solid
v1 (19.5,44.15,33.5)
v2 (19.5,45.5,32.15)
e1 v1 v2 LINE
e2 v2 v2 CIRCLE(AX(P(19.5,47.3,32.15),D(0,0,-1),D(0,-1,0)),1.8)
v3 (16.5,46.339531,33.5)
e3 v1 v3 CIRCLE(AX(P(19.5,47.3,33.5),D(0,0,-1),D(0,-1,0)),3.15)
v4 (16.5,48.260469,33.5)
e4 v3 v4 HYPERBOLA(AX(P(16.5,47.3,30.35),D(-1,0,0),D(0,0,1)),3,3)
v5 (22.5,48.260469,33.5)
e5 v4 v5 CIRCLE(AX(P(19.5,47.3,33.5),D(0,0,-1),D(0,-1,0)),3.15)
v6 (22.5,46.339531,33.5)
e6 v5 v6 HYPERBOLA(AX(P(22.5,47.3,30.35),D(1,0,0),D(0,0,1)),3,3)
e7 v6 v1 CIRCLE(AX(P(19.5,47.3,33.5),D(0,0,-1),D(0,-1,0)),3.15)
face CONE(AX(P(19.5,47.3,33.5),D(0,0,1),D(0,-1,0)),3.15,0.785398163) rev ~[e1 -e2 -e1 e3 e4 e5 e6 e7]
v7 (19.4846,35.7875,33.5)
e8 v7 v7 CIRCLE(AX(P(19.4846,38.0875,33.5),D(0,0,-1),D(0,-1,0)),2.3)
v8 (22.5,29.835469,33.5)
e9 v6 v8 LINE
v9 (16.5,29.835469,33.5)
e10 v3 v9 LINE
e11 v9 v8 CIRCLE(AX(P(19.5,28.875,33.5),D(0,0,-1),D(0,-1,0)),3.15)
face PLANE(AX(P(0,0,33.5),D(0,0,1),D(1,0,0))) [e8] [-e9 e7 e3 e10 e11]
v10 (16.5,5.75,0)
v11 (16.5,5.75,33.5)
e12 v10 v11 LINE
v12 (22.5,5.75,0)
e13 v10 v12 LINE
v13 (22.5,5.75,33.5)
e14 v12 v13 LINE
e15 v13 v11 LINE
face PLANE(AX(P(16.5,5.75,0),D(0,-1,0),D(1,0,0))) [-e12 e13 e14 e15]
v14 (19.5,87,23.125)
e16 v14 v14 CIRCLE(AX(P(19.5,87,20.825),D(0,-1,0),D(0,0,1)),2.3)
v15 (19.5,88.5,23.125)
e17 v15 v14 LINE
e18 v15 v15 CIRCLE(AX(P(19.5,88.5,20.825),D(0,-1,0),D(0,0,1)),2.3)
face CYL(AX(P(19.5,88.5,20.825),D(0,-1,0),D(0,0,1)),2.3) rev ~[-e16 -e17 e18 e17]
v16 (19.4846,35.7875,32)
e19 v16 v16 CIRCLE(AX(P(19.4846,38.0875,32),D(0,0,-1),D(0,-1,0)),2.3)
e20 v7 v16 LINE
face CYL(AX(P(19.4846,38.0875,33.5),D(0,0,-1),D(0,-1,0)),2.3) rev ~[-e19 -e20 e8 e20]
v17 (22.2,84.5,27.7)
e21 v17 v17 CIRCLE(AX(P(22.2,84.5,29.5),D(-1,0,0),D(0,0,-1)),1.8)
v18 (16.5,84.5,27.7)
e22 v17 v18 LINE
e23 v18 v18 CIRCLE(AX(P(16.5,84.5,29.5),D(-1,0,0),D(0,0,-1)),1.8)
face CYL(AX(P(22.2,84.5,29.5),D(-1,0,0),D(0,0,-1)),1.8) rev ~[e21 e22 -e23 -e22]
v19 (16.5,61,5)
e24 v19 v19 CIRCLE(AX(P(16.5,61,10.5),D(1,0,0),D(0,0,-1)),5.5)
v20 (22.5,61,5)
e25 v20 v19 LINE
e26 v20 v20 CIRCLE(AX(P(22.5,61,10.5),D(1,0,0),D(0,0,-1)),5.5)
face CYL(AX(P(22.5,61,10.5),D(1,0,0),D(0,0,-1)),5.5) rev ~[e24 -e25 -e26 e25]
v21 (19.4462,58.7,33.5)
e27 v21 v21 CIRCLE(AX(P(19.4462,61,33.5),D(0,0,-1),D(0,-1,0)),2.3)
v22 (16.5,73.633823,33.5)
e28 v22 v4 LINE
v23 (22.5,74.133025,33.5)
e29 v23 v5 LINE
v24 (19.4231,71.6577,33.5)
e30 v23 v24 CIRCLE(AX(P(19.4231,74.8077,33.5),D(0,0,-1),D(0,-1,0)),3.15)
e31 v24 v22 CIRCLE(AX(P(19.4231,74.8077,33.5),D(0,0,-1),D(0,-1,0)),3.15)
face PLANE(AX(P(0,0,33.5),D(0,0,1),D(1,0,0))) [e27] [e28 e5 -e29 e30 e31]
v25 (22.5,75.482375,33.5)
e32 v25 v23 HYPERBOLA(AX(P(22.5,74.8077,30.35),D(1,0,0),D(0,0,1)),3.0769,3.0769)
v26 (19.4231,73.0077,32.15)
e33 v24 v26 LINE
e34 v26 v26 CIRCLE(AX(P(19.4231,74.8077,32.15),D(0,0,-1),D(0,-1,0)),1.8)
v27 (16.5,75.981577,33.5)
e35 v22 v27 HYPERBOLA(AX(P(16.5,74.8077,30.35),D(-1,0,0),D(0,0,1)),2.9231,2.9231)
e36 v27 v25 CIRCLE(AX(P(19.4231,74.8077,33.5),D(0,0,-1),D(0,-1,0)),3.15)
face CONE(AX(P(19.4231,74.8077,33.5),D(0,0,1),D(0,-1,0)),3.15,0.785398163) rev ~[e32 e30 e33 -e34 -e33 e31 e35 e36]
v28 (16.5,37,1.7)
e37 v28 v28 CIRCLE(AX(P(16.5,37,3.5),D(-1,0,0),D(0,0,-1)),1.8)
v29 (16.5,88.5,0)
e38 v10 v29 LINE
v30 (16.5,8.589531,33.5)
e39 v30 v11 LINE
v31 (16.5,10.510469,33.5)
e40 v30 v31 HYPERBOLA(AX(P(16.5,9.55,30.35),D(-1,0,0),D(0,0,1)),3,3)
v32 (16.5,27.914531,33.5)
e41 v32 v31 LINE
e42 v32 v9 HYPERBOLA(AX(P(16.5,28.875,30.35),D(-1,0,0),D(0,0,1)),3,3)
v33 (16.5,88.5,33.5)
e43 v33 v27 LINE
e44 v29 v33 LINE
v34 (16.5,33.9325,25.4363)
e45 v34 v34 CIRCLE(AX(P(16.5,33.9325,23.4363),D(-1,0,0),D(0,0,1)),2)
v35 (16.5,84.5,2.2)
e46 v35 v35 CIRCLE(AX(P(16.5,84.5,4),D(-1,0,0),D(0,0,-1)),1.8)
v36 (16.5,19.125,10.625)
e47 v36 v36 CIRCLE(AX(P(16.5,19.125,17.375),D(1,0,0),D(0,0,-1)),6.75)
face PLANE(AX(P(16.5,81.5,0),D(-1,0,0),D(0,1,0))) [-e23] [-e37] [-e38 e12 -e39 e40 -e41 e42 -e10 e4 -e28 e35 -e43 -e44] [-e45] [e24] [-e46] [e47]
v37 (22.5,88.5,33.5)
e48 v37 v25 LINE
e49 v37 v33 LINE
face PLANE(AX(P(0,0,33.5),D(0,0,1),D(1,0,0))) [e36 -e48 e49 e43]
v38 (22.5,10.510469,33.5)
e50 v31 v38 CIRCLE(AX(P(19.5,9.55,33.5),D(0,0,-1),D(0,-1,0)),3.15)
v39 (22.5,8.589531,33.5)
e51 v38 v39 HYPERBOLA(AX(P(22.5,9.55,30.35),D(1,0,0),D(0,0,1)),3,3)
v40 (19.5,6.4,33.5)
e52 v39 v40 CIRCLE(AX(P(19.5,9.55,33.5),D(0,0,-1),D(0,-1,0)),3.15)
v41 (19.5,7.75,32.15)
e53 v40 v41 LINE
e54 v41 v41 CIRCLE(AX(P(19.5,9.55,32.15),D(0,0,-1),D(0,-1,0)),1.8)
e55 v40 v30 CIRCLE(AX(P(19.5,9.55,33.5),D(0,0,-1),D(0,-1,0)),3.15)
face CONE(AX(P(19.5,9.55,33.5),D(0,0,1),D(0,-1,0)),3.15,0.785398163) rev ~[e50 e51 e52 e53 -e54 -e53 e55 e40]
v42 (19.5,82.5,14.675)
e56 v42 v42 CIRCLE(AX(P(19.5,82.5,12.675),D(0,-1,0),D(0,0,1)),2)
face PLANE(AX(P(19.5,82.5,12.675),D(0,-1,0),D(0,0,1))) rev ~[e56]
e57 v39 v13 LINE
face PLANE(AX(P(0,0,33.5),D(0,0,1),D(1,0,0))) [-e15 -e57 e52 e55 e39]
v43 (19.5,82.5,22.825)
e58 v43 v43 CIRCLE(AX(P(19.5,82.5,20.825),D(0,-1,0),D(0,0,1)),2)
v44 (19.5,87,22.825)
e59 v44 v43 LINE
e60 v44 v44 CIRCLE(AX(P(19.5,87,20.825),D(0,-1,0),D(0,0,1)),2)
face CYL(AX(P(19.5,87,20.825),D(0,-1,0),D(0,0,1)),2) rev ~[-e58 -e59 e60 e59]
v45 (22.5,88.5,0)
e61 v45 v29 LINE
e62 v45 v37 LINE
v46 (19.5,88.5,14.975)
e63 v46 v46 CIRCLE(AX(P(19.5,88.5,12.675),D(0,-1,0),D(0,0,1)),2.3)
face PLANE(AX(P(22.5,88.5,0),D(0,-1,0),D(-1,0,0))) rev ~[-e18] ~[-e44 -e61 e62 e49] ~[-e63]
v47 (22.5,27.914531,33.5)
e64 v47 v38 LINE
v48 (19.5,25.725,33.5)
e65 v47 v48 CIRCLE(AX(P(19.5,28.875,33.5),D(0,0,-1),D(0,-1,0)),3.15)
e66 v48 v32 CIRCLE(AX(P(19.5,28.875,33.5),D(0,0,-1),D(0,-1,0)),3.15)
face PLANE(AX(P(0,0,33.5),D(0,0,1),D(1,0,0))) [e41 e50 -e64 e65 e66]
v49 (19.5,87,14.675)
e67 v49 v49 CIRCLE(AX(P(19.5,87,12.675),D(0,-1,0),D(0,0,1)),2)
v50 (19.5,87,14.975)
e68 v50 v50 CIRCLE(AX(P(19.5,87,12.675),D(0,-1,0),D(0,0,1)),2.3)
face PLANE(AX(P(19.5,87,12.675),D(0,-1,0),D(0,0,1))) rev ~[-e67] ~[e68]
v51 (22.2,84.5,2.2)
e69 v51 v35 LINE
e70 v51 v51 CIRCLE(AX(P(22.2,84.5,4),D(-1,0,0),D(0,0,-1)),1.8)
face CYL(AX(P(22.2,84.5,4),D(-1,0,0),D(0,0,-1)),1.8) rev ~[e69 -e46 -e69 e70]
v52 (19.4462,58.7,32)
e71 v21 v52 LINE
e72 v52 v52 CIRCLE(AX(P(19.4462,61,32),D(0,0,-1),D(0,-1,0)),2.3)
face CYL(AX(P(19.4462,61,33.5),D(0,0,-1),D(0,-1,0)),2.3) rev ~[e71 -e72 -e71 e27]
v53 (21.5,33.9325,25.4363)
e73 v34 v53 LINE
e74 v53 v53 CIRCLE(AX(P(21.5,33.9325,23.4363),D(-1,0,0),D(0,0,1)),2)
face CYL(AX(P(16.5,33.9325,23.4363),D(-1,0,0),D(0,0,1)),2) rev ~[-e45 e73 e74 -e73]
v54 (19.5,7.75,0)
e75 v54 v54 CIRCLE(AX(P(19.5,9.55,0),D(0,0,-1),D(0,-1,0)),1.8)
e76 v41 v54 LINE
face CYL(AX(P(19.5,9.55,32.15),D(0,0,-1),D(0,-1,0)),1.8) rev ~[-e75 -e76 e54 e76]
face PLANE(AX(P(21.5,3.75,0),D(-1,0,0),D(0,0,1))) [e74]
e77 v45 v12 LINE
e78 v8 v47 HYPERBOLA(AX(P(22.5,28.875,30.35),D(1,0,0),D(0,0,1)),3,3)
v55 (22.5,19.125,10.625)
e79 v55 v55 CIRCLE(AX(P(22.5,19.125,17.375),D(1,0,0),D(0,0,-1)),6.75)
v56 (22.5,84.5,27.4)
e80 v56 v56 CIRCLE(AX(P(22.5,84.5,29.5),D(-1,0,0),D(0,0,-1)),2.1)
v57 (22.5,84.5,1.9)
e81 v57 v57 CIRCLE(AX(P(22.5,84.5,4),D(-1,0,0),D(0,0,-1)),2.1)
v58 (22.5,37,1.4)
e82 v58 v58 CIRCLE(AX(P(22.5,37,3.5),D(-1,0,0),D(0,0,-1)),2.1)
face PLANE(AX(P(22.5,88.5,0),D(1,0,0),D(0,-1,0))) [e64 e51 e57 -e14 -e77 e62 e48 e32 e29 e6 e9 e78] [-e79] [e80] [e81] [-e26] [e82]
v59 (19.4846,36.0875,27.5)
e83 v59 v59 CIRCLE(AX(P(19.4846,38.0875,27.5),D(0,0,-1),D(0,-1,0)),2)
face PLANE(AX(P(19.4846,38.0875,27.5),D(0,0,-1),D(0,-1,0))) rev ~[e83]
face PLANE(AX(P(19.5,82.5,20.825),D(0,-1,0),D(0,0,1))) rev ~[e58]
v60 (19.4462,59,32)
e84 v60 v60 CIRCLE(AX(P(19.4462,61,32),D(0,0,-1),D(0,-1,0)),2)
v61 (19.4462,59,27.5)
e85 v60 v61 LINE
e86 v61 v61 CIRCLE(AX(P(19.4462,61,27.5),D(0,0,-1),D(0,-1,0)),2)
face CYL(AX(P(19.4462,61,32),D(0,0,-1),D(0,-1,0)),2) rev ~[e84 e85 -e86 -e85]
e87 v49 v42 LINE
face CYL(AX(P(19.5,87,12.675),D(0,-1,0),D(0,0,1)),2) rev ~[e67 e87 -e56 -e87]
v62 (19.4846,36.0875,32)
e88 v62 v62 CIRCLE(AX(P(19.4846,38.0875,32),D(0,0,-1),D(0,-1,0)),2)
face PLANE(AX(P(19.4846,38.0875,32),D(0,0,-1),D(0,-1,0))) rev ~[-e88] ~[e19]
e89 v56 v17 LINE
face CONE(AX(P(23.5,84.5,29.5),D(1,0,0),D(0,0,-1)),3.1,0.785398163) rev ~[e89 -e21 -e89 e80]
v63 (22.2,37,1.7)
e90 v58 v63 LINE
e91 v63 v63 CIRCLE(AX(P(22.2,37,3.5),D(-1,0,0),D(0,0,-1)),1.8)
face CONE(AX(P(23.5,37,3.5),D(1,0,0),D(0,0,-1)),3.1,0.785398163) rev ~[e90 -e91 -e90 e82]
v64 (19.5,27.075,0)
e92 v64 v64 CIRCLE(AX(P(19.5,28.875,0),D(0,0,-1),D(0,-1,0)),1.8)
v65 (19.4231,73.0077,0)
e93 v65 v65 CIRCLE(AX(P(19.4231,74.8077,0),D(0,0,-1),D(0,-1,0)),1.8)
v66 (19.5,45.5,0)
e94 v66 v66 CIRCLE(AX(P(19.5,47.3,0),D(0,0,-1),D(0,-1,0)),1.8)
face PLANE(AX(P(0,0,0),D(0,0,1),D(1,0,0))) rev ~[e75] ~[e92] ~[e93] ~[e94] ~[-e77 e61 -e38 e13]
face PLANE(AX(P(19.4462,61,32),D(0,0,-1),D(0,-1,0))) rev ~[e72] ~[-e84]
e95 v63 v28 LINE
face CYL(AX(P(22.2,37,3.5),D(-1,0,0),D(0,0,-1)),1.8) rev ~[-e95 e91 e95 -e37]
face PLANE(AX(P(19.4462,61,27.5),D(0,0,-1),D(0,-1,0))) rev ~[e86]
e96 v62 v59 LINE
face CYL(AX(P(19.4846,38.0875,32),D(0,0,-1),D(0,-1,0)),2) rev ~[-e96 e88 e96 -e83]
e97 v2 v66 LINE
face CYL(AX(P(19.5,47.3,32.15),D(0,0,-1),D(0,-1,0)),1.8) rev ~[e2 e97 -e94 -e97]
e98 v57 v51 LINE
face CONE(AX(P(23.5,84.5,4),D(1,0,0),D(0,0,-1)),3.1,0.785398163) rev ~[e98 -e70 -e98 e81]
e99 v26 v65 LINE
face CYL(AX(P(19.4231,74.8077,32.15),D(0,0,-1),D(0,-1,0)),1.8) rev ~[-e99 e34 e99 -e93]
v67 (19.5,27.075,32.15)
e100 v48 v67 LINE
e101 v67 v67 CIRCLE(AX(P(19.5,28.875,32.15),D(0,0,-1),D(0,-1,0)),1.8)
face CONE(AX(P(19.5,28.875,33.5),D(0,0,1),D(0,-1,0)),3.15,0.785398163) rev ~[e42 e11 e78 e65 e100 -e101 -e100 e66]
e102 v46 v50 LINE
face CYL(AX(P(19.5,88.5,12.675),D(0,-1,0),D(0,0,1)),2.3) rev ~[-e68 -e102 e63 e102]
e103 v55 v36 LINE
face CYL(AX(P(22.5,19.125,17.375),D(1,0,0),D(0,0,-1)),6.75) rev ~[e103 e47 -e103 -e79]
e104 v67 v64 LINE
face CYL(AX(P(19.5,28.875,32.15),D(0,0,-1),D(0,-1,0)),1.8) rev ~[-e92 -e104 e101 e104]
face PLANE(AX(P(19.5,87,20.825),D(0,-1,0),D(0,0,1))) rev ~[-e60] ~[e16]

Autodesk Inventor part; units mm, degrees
ref_plane "YZ Plane" through (0, 0, 0) normal (1, 0, 0) x (0, 1, 0)
ref_plane "XZ Plane" through (0, 0, 0) normal (0, 1, 0) x (-1, 0, 0)
ref_plane "Work Plane1" through (0, 0, 0) normal (0, 0, 1) x (1, 0, 0)
sketch "Sketch1" plane through (0, 0, 0) normal (0, 0, 1) x (1, 0, 0)
  line L0 (23.5, 88.5) -> (-23.5, 88.5) projected
  line L1 (-23.5, 88.5) -> (-23.5, 36.5) projected
  line L2 (-26.5, 33.5) -> (-89, 33.5) projected
  line L3 (-89, 33.5) -> (-89, -72.5) projected
  line L4 (-89, -72.5) -> (-77, -72.5) projected
  line L5 (-74, -75.5) -> (-74, -93.5) projected
  line L6 (-74, -93.5) -> (74, -93.5) projected
  line L7 (74, -93.5) -> (74, -75.5) projected
  line L8 (77, -72.5) -> (89, -72.5) projected
  line L9 (89, -72.5) -> (89, 33.5) projected
  line L10 (89, 33.5) -> (26.5, 33.5) projected
  line L11 (23.5, 36.5) -> (23.5, 88.5) projected
  line L12 (-4.5, 81.5) -> (-4.5, 36.5) projected
  line L13 (-7.5, 33.5) -> (-13.5, 33.5) projected
  line L14 (-16.5, 36.5) -> (-16.5, 81.5) projected
  line L15 (7.5, 84.5) -> (13.5, 84.5) projected
  line L16 (16.5, 81.5) -> (16.5, 36.5) projected
  line L17 (13.5, 33.5) -> (7.5, 33.5) projected
  line L18 (4.5, 36.5) -> (4.5, 81.5) projected
  line L19 (-13.5, 84.5) -> (-7.5, 84.5) projected
  line L20 (16.5, 88.5) -> (22.5, 88.5)
  line L21 (22.5, 88.5) -> (22.5, 3.75)
  line L22 (22.5, 3.75) -> (16.5, 3.75)
  line L23 (16.5, 3.75) -> (16.5, 88.5)
  line L24 (59.9, 4.75) -> (32.2, 4.75)
  arc A0 (13.5, 33.5) -> (16.5, 36.5) centre (13.5, 36.5) ccw projected
  arc A1 (4.5, 36.5) -> (7.5, 33.5) centre (7.5, 36.5) ccw projected
  arc A2 (7.5, 84.5) -> (4.5, 81.5) centre (7.5, 81.5) ccw projected
  arc A3 (16.5, 81.5) -> (13.5, 84.5) centre (13.5, 81.5) ccw projected
  arc A4 (-4.5, 81.5) -> (-7.5, 84.5) centre (-7.5, 81.5) ccw projected
  arc A5 (-7.5, 33.5) -> (-4.5, 36.5) centre (-7.5, 36.5) ccw projected
  arc A6 (-16.5, 36.5) -> (-13.5, 33.5) centre (-13.5, 36.5) ccw projected
  arc A7 (-13.5, 84.5) -> (-16.5, 81.5) centre (-13.5, 81.5) ccw projected
  arc A8 (-26.5, 33.5) -> (-23.5, 36.5) centre (-26.5, 36.5) ccw projected
  arc A9 (-74, -75.5) -> (-77, -72.5) centre (-77, -75.5) ccw projected
  arc A10 (77, -72.5) -> (74, -75.5) centre (77, -75.5) ccw projected
  arc A11 (23.5, 36.5) -> (26.5, 33.5) centre (26.5, 36.5) ccw projected
  circle A12 centre (21.5, -85.5) radius 1.8 projected
  circle A13 centre (-64.5, -85.5) radius 1.8 projected
  circle A14 centre (83.4, -16.3889) radius 1.8 projected
  circle A15 centre (-83.4, -19.2889) radius 1.8 projected
  circle A16 centre (-21.5, -85.5) radius 1.8 projected
  circle A17 centre (64.5, -85.5) radius 1.8 projected
  circle A18 centre (-56.0375, 15.0937) radius 1.0065 projected
  circle A19 centre (39.125, 4.3375) radius 1.0065 projected
  circle A20 centre (-72.95, 4.275) radius 1.0065 projected
  circle A21 centre (39.125, 25.9125) radius 1.0065 projected
  circle A22 centre (72.95, 12.275) radius 1.0065 projected
  circle A23 centre (86, 30.5) radius 1.0065 projected
  circle A24 centre (-86, 30.5) radius 1.0065 projected
  circle A25 centre (-39.125, 12.3375) radius 1.0065 projected
  circle A26 centre (-72.95, 25.975) radius 1.0065 projected
  circle A27 centre (-72.95, 12.275) radius 1.0065 projected
  circle A28 centre (-39.125, 25.9125) radius 1.0065 projected
  circle A29 centre (-86, 7.75) radius 1.0065 projected
  circle A30 centre (86, 7.75) radius 1.0065 projected
  circle A31 centre (72.95, 25.975) radius 1.0065 projected
  circle A32 centre (39.125, 12.3375) radius 1.0065 projected
  circle A33 centre (-39.125, 4.3375) radius 1.0065 projected
  circle A34 centre (72.95, 4.275) radius 1.0065 projected
  circle A35 centre (56.0375, 15.125) radius 1.0065 projected
  circle A36 centre (78, -67.1725) radius 1.2295 projected
  circle A37 centre (-24.1, -73.1) radius 1.2295 projected
  circle A38 centre (24.1, -24.9) radius 1.2295 projected
  circle A39 centre (-42.5, -43.2802) radius 1.2295 projected
  circle A40 centre (-79, -42.3889) radius 1.2295 projected
  circle A41 centre (-19.5, 28.875) radius 1.2295 projected
  circle A42 centre (19.5, 9.55) radius 1.2295 projected
  circle A43 centre (19.5, 47.3) radius 1.2295 projected
  circle A44 centre (-19.5, 47.3) radius 1.2295 projected
  circle A45 centre (0, 74.7) radius 1.2295 projected
  circle A46 centre (-19.4231, 74.8077) radius 1.2295 projected
  circle A47 centre (19.5, 74.7) radius 1.2295 projected
  circle A48 centre (0, 49.05) radius 1.2295 projected
  circle A49 centre (19.5, 28.875) radius 1.2295 projected
  circle A50 centre (0, 19.125) radius 1.2295 projected
  circle A51 centre (-19.5, 9.55) radius 1.2295 projected
  circle A52 centre (-78, -67.1725) radius 1.2295 projected
  circle A53 centre (-24.1, -24.9) radius 1.2295 projected
  circle A54 centre (24.1, -73.1) radius 1.2295 projected
  circle A55 centre (42.5, -42.7745) radius 1.2295 projected
  circle A56 centre (79, -42.3889) radius 1.2295 projected
  point P0 (0, 0)
  point P1 (7.5, 81.5)
  point P2 (13.5, 81.5)
  point P3 (-7.5, 81.5)
  point P4 (-13.5, 81.5)
  dimension "d0" = 1
  dimension "d1" = 1
ref_plane "Work Plane2" through (-89, -40.3889, 33.5) normal (0, 0, 1) x (1, 0, 0)
extrude "Extrusion1" add sketch "Sketch1" along normal up to surface (33.5 mm away) contours L21 L22 L23 L16 L0 | A42 | A43 | A47 | A49
sketch "Sketch2" plane through (22.5, 3.75, 0) normal (1, 0, 0) x (0, 0, -1)
  circle A0 centre (-17.375, 15.375) radius 6.75 projected
  circle A1 centre (-10.5, 57.25) radius 5.5 projected
  point P0 (0, -3.75)
  dimension "d8" = 11
extrude "Extrusion2" cut sketch "Sketch2" against normal up to next
sketch "Sketch3" plane through (16.5, 3.75, 0) normal (-1, 0, 0) x (0, 0, 1)
  circle A0 centre (23.4363, 30.1825) radius 2 projected
  point P0 (0, -3.75)
extrude "Extrusion3" cut sketch "Sketch3" against normal blind 5
ref_plane "Work Plane3" through (23.5, 3.75, 0) normal (1, 0, 0) x (0, 0, -1)
sketch "Sketch4" plane through (23.5, 3.75, 0) normal (1, 0, 0) x (0, 0, -1)
  circle A0 centre (-29.5, 80.75) radius 1.8 projected
  circle A1 centre (-3.5, 33.25) radius 1.8 projected
  circle A2 centre (-4, 80.75) radius 1.8 projected
  point P0 (0, -3.75)
hole "Hole1" at (23.5, 37, 3.5) at (23.5, 84.5, 4) at (23.5, 84.5, 29.5) direction (-1, 0, 0) diameter 3.6 end through all countersink diameter 6.2 countersink angle 90 clearance for "Countersunk Flat Head Screw ISO 2009/7046" size "M3" standard "ISO"
sketch "Sketch5" plane through (16.5, 3.75, 33.5) normal (0, 0, 1) x (1, 0, 0)
  circle A0 centre (-36, 5.8) radius 1.8 projected
  circle A1 centre (-36, 25.125) radius 1.8 projected
  circle A2 centre (-36, 43.55) radius 1.8 projected
  circle A3 centre (-35.9231, 71.0577) radius 1.8 projected
  circle A4 centre (-16.5, 45.3) radius 3.3 projected
  circle A5 centre (-16.5, 15.375) radius 3.3 projected
  circle A6 centre (-16.5, 70.95) radius 3.3 projected
  line L0 (-12, 2) -> (-21, 2) projected
  line L1 (-12, 84.75) -> (-12, 2) projected
  line L2 (-21, 84.75) -> (-12, 84.75) projected
  line L3 (-21, 2) -> (-21, 84.75) projected
  line L4 (-16.5, 2) -> (-16.5, 84.75)
  circle A7 centre (3, 5.8) radius 1.8
  circle A8 centre (3, 25.125) radius 1.8
  circle A9 centre (3, 43.55) radius 1.8
  circle A10 centre (2.9231, 71.0577) radius 1.8
  circle A11 centre (-16.5, 30.7161) radius 2.3 projected
  circle A12 centre (-16.5, 59.25) radius 2.3 projected
  point P0 (-16.5, -3.75)
hole "Hole2" at (19.5, 9.55, 33.5) at (19.5, 28.875, 33.5) at (19.5, 47.3, 33.5) at (19.4231, 74.8077, 33.5) direction (0, 0, -1) diameter 3.6 end through all countersink diameter 6.3 countersink angle 90 clearance for "Countersunk Flat Head Screw ISO 2009/7046" size "M3" standard "ISO"
sketch "Sketch7" plane through (16.5, 88.5, 0) normal (0, 1, 0) x (1, 0, 0)
  line L0 (0, -33.5) -> (6, -33.5) projected
  line L1 (6, 0) -> (6, -33.5) projected
  line L2 (6, 0) -> (0, 0) projected
  line L3 (0, 0) -> (0, -33.5) projected
  circle A0 centre (-16.5, -12.675) radius 2 projected
  circle A1 centre (-16.5, -20.825) radius 2 projected
  line L4 (-16.5, -20.825) -> (6, -20.825)
  line L5 (-16.5, -12.675) -> (6, -12.675)
  line L6 (6, -5) -> (6, -16) projected
  point P0 (-16.5, 0)
  point P1 (3, -20.825)
  point P2 (3, -12.675)
hole "Hole4" at (19.5, 88.5, 20.825) at (19.5, 88.5, 12.675) direction (0, -1, 0) diameter 4 depth 6 counterbore diameter 4.6 counterbore depth 1.5
sketch "Sketch8" plane through (19.5, 47.3, 33.5) normal (0, 0, 1) x (1, 0, 0)
  circle A0 centre (-39, -9.2125) radius 2.3 projected
  circle A1 centre (-39, 13.7) radius 2.3 projected
  arc A2 (3, 0.9605) -> (-3, 0.9605) centre (0, 0) ccw projected
  line L0 (3, 26.8331) -> (3, 0.9605) projected
  arc A3 (-3, 26.3338) -> (3, 26.8331) centre (-0.0769, 27.5077) ccw projected
  line L1 (-3, 0.9605) -> (-3, 26.3338) projected
  arc A4 (-3, -0.9605) -> (3, -0.9605) centre (0, 0) ccw projected
  line L2 (-3, -17.4645) -> (-3, -0.9605) projected
  arc A5 (3, -17.4645) -> (-3, -17.4645) centre (0, -18.425) ccw projected
  line L3 (3, -0.9605) -> (3, -17.4645) projected
  line L4 (-39, 13.7) -> (3, 13.7)
  line L5 (3, 19.2) -> (3, 8.2) projected
  line L6 (-39, -9.2125) -> (3, -9.2125)
  circle A6 centre (0, -18.425) radius 1.8 projected
  line L7 (0, -18.425) -> (-0.0769, 27.5077)
  point P0 (-19.5, -47.3)
  point P1 (-0.0538, 13.7)
  point P2 (-0.0154, -9.2125)
hole "Hole5" at (19.4462, 61, 33.5) at (19.4846, 38.0875, 33.5) direction (0, 0, -1) diameter 4 depth 6 counterbore diameter 4.6 counterbore depth 1.5
sketch "Sketch9" plane through (16.5, 3.75, 0) normal (0, -1, 0) x (1, 0, 0)
  line L0 (0, 0) -> (0, 33.5) projected
  line L1 (0, 0) -> (6, 0) projected
  line L2 (6, 0) -> (6, 33.5) projected
  line L3 (6, 33.5) -> (0, 33.5) projected
  point P0 (-16.5, 0)
extrude "Extrusion4" cut sketch "Sketch9" against normal blind 2
properties part number "left_gear_holder" material "Nylon 6/6"
